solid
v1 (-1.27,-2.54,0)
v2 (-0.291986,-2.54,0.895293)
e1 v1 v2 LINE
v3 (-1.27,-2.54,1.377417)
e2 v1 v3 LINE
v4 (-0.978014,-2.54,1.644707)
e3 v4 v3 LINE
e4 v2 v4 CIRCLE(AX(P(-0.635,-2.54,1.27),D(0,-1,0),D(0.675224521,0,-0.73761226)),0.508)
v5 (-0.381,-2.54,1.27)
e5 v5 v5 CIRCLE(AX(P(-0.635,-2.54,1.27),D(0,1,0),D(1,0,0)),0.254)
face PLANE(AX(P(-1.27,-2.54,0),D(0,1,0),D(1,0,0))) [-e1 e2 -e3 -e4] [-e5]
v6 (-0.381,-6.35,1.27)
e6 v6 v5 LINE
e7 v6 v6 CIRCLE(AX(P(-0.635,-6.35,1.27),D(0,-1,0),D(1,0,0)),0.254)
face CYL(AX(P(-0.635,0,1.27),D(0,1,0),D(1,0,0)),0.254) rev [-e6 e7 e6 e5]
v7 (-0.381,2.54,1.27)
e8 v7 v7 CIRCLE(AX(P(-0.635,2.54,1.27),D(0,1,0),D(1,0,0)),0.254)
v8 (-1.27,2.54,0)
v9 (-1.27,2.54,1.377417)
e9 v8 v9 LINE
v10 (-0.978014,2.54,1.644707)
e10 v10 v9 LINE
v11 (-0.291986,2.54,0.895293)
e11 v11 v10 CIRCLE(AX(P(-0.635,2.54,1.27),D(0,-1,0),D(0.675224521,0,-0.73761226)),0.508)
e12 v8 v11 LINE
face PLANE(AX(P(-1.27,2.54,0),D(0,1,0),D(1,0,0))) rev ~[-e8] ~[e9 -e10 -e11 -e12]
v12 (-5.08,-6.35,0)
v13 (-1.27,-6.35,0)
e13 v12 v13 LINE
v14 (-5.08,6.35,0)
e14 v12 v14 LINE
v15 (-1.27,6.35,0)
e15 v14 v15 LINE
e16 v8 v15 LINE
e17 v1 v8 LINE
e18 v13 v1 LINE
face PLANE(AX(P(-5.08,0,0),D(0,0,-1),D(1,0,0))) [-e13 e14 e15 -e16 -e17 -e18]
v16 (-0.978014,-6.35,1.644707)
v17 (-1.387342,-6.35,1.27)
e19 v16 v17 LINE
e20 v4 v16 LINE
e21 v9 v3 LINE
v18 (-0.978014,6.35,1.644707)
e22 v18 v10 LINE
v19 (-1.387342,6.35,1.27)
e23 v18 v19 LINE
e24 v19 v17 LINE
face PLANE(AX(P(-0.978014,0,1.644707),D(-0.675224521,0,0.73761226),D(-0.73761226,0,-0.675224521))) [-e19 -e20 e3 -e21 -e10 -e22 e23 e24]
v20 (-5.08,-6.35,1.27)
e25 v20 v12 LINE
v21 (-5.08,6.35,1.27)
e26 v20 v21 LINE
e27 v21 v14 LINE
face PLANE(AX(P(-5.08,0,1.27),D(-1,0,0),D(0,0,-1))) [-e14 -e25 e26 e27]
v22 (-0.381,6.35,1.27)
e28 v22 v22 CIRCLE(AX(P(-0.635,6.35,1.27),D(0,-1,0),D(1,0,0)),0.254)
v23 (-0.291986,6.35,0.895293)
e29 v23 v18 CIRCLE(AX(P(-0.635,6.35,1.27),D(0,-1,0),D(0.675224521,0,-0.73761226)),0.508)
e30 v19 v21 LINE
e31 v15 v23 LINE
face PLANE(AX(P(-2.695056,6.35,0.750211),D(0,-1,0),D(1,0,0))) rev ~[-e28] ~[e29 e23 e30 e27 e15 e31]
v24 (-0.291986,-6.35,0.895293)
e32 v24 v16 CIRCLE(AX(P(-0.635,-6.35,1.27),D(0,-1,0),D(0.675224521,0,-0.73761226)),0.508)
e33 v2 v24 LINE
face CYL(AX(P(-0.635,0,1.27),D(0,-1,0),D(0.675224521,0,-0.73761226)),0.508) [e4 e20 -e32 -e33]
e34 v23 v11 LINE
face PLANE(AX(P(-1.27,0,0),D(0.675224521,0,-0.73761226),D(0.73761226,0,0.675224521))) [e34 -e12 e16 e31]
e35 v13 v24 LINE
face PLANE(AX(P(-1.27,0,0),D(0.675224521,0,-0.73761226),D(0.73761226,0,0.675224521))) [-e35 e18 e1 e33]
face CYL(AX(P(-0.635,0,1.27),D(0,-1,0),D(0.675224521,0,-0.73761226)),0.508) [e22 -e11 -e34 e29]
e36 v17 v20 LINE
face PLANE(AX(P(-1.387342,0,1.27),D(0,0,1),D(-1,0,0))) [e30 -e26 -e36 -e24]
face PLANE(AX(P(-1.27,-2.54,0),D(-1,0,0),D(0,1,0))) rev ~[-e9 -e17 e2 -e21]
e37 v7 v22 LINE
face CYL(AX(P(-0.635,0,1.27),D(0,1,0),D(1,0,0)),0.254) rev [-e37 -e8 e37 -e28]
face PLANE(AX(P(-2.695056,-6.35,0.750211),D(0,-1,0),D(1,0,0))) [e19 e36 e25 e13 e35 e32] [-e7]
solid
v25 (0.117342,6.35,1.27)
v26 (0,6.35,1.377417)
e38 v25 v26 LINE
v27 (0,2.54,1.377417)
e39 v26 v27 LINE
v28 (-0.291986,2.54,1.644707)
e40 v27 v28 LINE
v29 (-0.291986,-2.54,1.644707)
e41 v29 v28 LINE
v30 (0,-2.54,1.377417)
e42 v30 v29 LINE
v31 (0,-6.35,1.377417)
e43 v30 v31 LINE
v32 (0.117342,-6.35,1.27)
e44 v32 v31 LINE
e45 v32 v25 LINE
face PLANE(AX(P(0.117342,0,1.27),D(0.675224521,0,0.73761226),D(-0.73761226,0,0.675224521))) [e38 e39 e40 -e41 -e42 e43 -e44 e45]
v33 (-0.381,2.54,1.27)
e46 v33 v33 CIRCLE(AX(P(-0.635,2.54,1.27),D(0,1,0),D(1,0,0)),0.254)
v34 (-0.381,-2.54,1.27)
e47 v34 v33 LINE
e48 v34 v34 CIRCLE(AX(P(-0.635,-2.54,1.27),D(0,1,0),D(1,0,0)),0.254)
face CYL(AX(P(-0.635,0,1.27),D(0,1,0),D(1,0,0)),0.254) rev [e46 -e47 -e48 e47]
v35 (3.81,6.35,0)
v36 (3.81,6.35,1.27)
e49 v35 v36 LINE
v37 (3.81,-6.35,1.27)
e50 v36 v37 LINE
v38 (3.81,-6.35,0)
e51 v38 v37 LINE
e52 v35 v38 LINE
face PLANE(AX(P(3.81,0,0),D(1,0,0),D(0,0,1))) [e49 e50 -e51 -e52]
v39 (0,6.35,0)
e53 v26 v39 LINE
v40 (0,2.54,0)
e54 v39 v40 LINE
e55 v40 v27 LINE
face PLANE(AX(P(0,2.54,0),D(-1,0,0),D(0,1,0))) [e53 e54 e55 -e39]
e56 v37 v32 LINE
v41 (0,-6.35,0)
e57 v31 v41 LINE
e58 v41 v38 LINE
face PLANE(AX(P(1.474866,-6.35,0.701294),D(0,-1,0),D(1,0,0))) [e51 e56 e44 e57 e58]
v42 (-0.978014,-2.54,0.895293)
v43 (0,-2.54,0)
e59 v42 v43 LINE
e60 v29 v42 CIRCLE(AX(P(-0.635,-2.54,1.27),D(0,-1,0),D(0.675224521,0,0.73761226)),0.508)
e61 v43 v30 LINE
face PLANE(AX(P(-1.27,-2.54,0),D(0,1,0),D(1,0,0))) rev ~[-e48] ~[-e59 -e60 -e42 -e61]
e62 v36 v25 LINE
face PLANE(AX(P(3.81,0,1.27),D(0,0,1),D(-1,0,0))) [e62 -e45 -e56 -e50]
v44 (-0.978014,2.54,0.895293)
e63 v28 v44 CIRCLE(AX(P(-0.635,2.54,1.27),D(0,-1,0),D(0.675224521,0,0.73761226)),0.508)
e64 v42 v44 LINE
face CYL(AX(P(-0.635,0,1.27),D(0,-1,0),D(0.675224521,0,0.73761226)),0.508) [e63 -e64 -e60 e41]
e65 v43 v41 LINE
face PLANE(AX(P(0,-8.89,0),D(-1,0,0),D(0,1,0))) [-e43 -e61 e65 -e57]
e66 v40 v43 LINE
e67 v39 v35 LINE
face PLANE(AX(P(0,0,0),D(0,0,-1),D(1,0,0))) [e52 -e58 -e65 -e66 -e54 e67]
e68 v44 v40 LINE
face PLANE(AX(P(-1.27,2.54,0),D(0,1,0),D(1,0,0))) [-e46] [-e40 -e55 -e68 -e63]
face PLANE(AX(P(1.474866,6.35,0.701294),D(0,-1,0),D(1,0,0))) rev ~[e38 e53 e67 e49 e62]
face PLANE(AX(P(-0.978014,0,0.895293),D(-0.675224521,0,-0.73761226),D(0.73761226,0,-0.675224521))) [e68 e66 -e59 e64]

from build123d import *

# Parameters (mm, degrees)
F0_R     = 0.254
F1_DEPTH = 6.35
F2_R     = 0.254
F3_DEPTH = 6.35
F4_W     = 1.27
F4_H     = 5.08
F5_DEPTH = 1.779
F4_H_2   = 6.35
F6_DEPTH = 1.779


with BuildPart() as f1:
    # F0 (on Front) → F1 (new body, symmetric)
    with BuildSketch(Plane.XZ):
        with BuildLine():
            Line((-0.9780140565, 0.8952929717), (0, 0))
            Line((0, 0), (3.81, 0))
            Line((3.81, 0), (3.81, 1.27))
            Line((3.81, 1.27), (0.117342346, 1.27))
            Line((0.117342346, 1.27), (-0.2919859435, 1.6447070283))
            ThreePointArc((-0.2919859435, 1.6447070283), (-0.1700725106, 1.4747105997), (-0.127, 1.27))
            ThreePointArc((-0.127, 1.27), (-0.4302894003, 0.8050725106), (-0.9780140565, 0.8952929717))
        make_face()
        with BuildLine():
            ThreePointArc((-0.2919859435, 1.6447070283), (-1.0097070283, 1.6130140565), (-0.9780140565, 0.8952929717))
            ThreePointArc((-0.9780140565, 0.8952929717), (-0.4302894003, 0.8050725106), (-0.127, 1.27))
            ThreePointArc((-0.127, 1.27), (-0.1700725106, 1.4747105997), (-0.2919859435, 1.6447070283))
        make_face()
        with Locations((-0.635, 1.27)):
            Circle(F0_R, mode=Mode.SUBTRACT)
    extrude(amount=F1_DEPTH, both=True)

    # F4 (on Top) → F6 (cut, through all)
    with BuildSketch(Plane.XY):
        with Locations((-0.635, 5.715)):
            Rectangle(F4_W, F4_H_2)
        with Locations((-0.635, -5.715)):
            Rectangle(F4_W, F4_H_2)
    extrude(amount=F6_DEPTH, mode=Mode.SUBTRACT)


with BuildPart() as f3:
    # F2 (on Front) → F3 (new body, symmetric)
    with BuildSketch(Plane.XZ):
        with BuildLine():
            Line((-1.27, 0), (-0.2919859435, 0.8952929717))
            ThreePointArc((-0.2919859435, 0.8952929717), (-0.2602929717, 1.6130140565), (-0.9780140565, 1.6447070283))
            Line((-0.9780140565, 1.6447070283), (-1.387342346, 1.27))
            Line((-1.387342346, 1.27), (-5.08, 1.27))
            Line((-5.08, 1.27), (-5.08, 0))
            Line((-5.08, 0), (-1.27, 0))
        make_face()
        with Locations((-0.635, 1.27)):
            Circle(F2_R, mode=Mode.SUBTRACT)
    extrude(amount=F3_DEPTH, both=True)

    # F4 (on Top) → F5 (cut, through all)
    with BuildSketch(Plane.XY):
        with Locations((-0.635, 0)):
            Rectangle(F4_W, F4_H)
    extrude(amount=F5_DEPTH, mode=Mode.SUBTRACT)


solid = Compound([f1.part, f3.part])
